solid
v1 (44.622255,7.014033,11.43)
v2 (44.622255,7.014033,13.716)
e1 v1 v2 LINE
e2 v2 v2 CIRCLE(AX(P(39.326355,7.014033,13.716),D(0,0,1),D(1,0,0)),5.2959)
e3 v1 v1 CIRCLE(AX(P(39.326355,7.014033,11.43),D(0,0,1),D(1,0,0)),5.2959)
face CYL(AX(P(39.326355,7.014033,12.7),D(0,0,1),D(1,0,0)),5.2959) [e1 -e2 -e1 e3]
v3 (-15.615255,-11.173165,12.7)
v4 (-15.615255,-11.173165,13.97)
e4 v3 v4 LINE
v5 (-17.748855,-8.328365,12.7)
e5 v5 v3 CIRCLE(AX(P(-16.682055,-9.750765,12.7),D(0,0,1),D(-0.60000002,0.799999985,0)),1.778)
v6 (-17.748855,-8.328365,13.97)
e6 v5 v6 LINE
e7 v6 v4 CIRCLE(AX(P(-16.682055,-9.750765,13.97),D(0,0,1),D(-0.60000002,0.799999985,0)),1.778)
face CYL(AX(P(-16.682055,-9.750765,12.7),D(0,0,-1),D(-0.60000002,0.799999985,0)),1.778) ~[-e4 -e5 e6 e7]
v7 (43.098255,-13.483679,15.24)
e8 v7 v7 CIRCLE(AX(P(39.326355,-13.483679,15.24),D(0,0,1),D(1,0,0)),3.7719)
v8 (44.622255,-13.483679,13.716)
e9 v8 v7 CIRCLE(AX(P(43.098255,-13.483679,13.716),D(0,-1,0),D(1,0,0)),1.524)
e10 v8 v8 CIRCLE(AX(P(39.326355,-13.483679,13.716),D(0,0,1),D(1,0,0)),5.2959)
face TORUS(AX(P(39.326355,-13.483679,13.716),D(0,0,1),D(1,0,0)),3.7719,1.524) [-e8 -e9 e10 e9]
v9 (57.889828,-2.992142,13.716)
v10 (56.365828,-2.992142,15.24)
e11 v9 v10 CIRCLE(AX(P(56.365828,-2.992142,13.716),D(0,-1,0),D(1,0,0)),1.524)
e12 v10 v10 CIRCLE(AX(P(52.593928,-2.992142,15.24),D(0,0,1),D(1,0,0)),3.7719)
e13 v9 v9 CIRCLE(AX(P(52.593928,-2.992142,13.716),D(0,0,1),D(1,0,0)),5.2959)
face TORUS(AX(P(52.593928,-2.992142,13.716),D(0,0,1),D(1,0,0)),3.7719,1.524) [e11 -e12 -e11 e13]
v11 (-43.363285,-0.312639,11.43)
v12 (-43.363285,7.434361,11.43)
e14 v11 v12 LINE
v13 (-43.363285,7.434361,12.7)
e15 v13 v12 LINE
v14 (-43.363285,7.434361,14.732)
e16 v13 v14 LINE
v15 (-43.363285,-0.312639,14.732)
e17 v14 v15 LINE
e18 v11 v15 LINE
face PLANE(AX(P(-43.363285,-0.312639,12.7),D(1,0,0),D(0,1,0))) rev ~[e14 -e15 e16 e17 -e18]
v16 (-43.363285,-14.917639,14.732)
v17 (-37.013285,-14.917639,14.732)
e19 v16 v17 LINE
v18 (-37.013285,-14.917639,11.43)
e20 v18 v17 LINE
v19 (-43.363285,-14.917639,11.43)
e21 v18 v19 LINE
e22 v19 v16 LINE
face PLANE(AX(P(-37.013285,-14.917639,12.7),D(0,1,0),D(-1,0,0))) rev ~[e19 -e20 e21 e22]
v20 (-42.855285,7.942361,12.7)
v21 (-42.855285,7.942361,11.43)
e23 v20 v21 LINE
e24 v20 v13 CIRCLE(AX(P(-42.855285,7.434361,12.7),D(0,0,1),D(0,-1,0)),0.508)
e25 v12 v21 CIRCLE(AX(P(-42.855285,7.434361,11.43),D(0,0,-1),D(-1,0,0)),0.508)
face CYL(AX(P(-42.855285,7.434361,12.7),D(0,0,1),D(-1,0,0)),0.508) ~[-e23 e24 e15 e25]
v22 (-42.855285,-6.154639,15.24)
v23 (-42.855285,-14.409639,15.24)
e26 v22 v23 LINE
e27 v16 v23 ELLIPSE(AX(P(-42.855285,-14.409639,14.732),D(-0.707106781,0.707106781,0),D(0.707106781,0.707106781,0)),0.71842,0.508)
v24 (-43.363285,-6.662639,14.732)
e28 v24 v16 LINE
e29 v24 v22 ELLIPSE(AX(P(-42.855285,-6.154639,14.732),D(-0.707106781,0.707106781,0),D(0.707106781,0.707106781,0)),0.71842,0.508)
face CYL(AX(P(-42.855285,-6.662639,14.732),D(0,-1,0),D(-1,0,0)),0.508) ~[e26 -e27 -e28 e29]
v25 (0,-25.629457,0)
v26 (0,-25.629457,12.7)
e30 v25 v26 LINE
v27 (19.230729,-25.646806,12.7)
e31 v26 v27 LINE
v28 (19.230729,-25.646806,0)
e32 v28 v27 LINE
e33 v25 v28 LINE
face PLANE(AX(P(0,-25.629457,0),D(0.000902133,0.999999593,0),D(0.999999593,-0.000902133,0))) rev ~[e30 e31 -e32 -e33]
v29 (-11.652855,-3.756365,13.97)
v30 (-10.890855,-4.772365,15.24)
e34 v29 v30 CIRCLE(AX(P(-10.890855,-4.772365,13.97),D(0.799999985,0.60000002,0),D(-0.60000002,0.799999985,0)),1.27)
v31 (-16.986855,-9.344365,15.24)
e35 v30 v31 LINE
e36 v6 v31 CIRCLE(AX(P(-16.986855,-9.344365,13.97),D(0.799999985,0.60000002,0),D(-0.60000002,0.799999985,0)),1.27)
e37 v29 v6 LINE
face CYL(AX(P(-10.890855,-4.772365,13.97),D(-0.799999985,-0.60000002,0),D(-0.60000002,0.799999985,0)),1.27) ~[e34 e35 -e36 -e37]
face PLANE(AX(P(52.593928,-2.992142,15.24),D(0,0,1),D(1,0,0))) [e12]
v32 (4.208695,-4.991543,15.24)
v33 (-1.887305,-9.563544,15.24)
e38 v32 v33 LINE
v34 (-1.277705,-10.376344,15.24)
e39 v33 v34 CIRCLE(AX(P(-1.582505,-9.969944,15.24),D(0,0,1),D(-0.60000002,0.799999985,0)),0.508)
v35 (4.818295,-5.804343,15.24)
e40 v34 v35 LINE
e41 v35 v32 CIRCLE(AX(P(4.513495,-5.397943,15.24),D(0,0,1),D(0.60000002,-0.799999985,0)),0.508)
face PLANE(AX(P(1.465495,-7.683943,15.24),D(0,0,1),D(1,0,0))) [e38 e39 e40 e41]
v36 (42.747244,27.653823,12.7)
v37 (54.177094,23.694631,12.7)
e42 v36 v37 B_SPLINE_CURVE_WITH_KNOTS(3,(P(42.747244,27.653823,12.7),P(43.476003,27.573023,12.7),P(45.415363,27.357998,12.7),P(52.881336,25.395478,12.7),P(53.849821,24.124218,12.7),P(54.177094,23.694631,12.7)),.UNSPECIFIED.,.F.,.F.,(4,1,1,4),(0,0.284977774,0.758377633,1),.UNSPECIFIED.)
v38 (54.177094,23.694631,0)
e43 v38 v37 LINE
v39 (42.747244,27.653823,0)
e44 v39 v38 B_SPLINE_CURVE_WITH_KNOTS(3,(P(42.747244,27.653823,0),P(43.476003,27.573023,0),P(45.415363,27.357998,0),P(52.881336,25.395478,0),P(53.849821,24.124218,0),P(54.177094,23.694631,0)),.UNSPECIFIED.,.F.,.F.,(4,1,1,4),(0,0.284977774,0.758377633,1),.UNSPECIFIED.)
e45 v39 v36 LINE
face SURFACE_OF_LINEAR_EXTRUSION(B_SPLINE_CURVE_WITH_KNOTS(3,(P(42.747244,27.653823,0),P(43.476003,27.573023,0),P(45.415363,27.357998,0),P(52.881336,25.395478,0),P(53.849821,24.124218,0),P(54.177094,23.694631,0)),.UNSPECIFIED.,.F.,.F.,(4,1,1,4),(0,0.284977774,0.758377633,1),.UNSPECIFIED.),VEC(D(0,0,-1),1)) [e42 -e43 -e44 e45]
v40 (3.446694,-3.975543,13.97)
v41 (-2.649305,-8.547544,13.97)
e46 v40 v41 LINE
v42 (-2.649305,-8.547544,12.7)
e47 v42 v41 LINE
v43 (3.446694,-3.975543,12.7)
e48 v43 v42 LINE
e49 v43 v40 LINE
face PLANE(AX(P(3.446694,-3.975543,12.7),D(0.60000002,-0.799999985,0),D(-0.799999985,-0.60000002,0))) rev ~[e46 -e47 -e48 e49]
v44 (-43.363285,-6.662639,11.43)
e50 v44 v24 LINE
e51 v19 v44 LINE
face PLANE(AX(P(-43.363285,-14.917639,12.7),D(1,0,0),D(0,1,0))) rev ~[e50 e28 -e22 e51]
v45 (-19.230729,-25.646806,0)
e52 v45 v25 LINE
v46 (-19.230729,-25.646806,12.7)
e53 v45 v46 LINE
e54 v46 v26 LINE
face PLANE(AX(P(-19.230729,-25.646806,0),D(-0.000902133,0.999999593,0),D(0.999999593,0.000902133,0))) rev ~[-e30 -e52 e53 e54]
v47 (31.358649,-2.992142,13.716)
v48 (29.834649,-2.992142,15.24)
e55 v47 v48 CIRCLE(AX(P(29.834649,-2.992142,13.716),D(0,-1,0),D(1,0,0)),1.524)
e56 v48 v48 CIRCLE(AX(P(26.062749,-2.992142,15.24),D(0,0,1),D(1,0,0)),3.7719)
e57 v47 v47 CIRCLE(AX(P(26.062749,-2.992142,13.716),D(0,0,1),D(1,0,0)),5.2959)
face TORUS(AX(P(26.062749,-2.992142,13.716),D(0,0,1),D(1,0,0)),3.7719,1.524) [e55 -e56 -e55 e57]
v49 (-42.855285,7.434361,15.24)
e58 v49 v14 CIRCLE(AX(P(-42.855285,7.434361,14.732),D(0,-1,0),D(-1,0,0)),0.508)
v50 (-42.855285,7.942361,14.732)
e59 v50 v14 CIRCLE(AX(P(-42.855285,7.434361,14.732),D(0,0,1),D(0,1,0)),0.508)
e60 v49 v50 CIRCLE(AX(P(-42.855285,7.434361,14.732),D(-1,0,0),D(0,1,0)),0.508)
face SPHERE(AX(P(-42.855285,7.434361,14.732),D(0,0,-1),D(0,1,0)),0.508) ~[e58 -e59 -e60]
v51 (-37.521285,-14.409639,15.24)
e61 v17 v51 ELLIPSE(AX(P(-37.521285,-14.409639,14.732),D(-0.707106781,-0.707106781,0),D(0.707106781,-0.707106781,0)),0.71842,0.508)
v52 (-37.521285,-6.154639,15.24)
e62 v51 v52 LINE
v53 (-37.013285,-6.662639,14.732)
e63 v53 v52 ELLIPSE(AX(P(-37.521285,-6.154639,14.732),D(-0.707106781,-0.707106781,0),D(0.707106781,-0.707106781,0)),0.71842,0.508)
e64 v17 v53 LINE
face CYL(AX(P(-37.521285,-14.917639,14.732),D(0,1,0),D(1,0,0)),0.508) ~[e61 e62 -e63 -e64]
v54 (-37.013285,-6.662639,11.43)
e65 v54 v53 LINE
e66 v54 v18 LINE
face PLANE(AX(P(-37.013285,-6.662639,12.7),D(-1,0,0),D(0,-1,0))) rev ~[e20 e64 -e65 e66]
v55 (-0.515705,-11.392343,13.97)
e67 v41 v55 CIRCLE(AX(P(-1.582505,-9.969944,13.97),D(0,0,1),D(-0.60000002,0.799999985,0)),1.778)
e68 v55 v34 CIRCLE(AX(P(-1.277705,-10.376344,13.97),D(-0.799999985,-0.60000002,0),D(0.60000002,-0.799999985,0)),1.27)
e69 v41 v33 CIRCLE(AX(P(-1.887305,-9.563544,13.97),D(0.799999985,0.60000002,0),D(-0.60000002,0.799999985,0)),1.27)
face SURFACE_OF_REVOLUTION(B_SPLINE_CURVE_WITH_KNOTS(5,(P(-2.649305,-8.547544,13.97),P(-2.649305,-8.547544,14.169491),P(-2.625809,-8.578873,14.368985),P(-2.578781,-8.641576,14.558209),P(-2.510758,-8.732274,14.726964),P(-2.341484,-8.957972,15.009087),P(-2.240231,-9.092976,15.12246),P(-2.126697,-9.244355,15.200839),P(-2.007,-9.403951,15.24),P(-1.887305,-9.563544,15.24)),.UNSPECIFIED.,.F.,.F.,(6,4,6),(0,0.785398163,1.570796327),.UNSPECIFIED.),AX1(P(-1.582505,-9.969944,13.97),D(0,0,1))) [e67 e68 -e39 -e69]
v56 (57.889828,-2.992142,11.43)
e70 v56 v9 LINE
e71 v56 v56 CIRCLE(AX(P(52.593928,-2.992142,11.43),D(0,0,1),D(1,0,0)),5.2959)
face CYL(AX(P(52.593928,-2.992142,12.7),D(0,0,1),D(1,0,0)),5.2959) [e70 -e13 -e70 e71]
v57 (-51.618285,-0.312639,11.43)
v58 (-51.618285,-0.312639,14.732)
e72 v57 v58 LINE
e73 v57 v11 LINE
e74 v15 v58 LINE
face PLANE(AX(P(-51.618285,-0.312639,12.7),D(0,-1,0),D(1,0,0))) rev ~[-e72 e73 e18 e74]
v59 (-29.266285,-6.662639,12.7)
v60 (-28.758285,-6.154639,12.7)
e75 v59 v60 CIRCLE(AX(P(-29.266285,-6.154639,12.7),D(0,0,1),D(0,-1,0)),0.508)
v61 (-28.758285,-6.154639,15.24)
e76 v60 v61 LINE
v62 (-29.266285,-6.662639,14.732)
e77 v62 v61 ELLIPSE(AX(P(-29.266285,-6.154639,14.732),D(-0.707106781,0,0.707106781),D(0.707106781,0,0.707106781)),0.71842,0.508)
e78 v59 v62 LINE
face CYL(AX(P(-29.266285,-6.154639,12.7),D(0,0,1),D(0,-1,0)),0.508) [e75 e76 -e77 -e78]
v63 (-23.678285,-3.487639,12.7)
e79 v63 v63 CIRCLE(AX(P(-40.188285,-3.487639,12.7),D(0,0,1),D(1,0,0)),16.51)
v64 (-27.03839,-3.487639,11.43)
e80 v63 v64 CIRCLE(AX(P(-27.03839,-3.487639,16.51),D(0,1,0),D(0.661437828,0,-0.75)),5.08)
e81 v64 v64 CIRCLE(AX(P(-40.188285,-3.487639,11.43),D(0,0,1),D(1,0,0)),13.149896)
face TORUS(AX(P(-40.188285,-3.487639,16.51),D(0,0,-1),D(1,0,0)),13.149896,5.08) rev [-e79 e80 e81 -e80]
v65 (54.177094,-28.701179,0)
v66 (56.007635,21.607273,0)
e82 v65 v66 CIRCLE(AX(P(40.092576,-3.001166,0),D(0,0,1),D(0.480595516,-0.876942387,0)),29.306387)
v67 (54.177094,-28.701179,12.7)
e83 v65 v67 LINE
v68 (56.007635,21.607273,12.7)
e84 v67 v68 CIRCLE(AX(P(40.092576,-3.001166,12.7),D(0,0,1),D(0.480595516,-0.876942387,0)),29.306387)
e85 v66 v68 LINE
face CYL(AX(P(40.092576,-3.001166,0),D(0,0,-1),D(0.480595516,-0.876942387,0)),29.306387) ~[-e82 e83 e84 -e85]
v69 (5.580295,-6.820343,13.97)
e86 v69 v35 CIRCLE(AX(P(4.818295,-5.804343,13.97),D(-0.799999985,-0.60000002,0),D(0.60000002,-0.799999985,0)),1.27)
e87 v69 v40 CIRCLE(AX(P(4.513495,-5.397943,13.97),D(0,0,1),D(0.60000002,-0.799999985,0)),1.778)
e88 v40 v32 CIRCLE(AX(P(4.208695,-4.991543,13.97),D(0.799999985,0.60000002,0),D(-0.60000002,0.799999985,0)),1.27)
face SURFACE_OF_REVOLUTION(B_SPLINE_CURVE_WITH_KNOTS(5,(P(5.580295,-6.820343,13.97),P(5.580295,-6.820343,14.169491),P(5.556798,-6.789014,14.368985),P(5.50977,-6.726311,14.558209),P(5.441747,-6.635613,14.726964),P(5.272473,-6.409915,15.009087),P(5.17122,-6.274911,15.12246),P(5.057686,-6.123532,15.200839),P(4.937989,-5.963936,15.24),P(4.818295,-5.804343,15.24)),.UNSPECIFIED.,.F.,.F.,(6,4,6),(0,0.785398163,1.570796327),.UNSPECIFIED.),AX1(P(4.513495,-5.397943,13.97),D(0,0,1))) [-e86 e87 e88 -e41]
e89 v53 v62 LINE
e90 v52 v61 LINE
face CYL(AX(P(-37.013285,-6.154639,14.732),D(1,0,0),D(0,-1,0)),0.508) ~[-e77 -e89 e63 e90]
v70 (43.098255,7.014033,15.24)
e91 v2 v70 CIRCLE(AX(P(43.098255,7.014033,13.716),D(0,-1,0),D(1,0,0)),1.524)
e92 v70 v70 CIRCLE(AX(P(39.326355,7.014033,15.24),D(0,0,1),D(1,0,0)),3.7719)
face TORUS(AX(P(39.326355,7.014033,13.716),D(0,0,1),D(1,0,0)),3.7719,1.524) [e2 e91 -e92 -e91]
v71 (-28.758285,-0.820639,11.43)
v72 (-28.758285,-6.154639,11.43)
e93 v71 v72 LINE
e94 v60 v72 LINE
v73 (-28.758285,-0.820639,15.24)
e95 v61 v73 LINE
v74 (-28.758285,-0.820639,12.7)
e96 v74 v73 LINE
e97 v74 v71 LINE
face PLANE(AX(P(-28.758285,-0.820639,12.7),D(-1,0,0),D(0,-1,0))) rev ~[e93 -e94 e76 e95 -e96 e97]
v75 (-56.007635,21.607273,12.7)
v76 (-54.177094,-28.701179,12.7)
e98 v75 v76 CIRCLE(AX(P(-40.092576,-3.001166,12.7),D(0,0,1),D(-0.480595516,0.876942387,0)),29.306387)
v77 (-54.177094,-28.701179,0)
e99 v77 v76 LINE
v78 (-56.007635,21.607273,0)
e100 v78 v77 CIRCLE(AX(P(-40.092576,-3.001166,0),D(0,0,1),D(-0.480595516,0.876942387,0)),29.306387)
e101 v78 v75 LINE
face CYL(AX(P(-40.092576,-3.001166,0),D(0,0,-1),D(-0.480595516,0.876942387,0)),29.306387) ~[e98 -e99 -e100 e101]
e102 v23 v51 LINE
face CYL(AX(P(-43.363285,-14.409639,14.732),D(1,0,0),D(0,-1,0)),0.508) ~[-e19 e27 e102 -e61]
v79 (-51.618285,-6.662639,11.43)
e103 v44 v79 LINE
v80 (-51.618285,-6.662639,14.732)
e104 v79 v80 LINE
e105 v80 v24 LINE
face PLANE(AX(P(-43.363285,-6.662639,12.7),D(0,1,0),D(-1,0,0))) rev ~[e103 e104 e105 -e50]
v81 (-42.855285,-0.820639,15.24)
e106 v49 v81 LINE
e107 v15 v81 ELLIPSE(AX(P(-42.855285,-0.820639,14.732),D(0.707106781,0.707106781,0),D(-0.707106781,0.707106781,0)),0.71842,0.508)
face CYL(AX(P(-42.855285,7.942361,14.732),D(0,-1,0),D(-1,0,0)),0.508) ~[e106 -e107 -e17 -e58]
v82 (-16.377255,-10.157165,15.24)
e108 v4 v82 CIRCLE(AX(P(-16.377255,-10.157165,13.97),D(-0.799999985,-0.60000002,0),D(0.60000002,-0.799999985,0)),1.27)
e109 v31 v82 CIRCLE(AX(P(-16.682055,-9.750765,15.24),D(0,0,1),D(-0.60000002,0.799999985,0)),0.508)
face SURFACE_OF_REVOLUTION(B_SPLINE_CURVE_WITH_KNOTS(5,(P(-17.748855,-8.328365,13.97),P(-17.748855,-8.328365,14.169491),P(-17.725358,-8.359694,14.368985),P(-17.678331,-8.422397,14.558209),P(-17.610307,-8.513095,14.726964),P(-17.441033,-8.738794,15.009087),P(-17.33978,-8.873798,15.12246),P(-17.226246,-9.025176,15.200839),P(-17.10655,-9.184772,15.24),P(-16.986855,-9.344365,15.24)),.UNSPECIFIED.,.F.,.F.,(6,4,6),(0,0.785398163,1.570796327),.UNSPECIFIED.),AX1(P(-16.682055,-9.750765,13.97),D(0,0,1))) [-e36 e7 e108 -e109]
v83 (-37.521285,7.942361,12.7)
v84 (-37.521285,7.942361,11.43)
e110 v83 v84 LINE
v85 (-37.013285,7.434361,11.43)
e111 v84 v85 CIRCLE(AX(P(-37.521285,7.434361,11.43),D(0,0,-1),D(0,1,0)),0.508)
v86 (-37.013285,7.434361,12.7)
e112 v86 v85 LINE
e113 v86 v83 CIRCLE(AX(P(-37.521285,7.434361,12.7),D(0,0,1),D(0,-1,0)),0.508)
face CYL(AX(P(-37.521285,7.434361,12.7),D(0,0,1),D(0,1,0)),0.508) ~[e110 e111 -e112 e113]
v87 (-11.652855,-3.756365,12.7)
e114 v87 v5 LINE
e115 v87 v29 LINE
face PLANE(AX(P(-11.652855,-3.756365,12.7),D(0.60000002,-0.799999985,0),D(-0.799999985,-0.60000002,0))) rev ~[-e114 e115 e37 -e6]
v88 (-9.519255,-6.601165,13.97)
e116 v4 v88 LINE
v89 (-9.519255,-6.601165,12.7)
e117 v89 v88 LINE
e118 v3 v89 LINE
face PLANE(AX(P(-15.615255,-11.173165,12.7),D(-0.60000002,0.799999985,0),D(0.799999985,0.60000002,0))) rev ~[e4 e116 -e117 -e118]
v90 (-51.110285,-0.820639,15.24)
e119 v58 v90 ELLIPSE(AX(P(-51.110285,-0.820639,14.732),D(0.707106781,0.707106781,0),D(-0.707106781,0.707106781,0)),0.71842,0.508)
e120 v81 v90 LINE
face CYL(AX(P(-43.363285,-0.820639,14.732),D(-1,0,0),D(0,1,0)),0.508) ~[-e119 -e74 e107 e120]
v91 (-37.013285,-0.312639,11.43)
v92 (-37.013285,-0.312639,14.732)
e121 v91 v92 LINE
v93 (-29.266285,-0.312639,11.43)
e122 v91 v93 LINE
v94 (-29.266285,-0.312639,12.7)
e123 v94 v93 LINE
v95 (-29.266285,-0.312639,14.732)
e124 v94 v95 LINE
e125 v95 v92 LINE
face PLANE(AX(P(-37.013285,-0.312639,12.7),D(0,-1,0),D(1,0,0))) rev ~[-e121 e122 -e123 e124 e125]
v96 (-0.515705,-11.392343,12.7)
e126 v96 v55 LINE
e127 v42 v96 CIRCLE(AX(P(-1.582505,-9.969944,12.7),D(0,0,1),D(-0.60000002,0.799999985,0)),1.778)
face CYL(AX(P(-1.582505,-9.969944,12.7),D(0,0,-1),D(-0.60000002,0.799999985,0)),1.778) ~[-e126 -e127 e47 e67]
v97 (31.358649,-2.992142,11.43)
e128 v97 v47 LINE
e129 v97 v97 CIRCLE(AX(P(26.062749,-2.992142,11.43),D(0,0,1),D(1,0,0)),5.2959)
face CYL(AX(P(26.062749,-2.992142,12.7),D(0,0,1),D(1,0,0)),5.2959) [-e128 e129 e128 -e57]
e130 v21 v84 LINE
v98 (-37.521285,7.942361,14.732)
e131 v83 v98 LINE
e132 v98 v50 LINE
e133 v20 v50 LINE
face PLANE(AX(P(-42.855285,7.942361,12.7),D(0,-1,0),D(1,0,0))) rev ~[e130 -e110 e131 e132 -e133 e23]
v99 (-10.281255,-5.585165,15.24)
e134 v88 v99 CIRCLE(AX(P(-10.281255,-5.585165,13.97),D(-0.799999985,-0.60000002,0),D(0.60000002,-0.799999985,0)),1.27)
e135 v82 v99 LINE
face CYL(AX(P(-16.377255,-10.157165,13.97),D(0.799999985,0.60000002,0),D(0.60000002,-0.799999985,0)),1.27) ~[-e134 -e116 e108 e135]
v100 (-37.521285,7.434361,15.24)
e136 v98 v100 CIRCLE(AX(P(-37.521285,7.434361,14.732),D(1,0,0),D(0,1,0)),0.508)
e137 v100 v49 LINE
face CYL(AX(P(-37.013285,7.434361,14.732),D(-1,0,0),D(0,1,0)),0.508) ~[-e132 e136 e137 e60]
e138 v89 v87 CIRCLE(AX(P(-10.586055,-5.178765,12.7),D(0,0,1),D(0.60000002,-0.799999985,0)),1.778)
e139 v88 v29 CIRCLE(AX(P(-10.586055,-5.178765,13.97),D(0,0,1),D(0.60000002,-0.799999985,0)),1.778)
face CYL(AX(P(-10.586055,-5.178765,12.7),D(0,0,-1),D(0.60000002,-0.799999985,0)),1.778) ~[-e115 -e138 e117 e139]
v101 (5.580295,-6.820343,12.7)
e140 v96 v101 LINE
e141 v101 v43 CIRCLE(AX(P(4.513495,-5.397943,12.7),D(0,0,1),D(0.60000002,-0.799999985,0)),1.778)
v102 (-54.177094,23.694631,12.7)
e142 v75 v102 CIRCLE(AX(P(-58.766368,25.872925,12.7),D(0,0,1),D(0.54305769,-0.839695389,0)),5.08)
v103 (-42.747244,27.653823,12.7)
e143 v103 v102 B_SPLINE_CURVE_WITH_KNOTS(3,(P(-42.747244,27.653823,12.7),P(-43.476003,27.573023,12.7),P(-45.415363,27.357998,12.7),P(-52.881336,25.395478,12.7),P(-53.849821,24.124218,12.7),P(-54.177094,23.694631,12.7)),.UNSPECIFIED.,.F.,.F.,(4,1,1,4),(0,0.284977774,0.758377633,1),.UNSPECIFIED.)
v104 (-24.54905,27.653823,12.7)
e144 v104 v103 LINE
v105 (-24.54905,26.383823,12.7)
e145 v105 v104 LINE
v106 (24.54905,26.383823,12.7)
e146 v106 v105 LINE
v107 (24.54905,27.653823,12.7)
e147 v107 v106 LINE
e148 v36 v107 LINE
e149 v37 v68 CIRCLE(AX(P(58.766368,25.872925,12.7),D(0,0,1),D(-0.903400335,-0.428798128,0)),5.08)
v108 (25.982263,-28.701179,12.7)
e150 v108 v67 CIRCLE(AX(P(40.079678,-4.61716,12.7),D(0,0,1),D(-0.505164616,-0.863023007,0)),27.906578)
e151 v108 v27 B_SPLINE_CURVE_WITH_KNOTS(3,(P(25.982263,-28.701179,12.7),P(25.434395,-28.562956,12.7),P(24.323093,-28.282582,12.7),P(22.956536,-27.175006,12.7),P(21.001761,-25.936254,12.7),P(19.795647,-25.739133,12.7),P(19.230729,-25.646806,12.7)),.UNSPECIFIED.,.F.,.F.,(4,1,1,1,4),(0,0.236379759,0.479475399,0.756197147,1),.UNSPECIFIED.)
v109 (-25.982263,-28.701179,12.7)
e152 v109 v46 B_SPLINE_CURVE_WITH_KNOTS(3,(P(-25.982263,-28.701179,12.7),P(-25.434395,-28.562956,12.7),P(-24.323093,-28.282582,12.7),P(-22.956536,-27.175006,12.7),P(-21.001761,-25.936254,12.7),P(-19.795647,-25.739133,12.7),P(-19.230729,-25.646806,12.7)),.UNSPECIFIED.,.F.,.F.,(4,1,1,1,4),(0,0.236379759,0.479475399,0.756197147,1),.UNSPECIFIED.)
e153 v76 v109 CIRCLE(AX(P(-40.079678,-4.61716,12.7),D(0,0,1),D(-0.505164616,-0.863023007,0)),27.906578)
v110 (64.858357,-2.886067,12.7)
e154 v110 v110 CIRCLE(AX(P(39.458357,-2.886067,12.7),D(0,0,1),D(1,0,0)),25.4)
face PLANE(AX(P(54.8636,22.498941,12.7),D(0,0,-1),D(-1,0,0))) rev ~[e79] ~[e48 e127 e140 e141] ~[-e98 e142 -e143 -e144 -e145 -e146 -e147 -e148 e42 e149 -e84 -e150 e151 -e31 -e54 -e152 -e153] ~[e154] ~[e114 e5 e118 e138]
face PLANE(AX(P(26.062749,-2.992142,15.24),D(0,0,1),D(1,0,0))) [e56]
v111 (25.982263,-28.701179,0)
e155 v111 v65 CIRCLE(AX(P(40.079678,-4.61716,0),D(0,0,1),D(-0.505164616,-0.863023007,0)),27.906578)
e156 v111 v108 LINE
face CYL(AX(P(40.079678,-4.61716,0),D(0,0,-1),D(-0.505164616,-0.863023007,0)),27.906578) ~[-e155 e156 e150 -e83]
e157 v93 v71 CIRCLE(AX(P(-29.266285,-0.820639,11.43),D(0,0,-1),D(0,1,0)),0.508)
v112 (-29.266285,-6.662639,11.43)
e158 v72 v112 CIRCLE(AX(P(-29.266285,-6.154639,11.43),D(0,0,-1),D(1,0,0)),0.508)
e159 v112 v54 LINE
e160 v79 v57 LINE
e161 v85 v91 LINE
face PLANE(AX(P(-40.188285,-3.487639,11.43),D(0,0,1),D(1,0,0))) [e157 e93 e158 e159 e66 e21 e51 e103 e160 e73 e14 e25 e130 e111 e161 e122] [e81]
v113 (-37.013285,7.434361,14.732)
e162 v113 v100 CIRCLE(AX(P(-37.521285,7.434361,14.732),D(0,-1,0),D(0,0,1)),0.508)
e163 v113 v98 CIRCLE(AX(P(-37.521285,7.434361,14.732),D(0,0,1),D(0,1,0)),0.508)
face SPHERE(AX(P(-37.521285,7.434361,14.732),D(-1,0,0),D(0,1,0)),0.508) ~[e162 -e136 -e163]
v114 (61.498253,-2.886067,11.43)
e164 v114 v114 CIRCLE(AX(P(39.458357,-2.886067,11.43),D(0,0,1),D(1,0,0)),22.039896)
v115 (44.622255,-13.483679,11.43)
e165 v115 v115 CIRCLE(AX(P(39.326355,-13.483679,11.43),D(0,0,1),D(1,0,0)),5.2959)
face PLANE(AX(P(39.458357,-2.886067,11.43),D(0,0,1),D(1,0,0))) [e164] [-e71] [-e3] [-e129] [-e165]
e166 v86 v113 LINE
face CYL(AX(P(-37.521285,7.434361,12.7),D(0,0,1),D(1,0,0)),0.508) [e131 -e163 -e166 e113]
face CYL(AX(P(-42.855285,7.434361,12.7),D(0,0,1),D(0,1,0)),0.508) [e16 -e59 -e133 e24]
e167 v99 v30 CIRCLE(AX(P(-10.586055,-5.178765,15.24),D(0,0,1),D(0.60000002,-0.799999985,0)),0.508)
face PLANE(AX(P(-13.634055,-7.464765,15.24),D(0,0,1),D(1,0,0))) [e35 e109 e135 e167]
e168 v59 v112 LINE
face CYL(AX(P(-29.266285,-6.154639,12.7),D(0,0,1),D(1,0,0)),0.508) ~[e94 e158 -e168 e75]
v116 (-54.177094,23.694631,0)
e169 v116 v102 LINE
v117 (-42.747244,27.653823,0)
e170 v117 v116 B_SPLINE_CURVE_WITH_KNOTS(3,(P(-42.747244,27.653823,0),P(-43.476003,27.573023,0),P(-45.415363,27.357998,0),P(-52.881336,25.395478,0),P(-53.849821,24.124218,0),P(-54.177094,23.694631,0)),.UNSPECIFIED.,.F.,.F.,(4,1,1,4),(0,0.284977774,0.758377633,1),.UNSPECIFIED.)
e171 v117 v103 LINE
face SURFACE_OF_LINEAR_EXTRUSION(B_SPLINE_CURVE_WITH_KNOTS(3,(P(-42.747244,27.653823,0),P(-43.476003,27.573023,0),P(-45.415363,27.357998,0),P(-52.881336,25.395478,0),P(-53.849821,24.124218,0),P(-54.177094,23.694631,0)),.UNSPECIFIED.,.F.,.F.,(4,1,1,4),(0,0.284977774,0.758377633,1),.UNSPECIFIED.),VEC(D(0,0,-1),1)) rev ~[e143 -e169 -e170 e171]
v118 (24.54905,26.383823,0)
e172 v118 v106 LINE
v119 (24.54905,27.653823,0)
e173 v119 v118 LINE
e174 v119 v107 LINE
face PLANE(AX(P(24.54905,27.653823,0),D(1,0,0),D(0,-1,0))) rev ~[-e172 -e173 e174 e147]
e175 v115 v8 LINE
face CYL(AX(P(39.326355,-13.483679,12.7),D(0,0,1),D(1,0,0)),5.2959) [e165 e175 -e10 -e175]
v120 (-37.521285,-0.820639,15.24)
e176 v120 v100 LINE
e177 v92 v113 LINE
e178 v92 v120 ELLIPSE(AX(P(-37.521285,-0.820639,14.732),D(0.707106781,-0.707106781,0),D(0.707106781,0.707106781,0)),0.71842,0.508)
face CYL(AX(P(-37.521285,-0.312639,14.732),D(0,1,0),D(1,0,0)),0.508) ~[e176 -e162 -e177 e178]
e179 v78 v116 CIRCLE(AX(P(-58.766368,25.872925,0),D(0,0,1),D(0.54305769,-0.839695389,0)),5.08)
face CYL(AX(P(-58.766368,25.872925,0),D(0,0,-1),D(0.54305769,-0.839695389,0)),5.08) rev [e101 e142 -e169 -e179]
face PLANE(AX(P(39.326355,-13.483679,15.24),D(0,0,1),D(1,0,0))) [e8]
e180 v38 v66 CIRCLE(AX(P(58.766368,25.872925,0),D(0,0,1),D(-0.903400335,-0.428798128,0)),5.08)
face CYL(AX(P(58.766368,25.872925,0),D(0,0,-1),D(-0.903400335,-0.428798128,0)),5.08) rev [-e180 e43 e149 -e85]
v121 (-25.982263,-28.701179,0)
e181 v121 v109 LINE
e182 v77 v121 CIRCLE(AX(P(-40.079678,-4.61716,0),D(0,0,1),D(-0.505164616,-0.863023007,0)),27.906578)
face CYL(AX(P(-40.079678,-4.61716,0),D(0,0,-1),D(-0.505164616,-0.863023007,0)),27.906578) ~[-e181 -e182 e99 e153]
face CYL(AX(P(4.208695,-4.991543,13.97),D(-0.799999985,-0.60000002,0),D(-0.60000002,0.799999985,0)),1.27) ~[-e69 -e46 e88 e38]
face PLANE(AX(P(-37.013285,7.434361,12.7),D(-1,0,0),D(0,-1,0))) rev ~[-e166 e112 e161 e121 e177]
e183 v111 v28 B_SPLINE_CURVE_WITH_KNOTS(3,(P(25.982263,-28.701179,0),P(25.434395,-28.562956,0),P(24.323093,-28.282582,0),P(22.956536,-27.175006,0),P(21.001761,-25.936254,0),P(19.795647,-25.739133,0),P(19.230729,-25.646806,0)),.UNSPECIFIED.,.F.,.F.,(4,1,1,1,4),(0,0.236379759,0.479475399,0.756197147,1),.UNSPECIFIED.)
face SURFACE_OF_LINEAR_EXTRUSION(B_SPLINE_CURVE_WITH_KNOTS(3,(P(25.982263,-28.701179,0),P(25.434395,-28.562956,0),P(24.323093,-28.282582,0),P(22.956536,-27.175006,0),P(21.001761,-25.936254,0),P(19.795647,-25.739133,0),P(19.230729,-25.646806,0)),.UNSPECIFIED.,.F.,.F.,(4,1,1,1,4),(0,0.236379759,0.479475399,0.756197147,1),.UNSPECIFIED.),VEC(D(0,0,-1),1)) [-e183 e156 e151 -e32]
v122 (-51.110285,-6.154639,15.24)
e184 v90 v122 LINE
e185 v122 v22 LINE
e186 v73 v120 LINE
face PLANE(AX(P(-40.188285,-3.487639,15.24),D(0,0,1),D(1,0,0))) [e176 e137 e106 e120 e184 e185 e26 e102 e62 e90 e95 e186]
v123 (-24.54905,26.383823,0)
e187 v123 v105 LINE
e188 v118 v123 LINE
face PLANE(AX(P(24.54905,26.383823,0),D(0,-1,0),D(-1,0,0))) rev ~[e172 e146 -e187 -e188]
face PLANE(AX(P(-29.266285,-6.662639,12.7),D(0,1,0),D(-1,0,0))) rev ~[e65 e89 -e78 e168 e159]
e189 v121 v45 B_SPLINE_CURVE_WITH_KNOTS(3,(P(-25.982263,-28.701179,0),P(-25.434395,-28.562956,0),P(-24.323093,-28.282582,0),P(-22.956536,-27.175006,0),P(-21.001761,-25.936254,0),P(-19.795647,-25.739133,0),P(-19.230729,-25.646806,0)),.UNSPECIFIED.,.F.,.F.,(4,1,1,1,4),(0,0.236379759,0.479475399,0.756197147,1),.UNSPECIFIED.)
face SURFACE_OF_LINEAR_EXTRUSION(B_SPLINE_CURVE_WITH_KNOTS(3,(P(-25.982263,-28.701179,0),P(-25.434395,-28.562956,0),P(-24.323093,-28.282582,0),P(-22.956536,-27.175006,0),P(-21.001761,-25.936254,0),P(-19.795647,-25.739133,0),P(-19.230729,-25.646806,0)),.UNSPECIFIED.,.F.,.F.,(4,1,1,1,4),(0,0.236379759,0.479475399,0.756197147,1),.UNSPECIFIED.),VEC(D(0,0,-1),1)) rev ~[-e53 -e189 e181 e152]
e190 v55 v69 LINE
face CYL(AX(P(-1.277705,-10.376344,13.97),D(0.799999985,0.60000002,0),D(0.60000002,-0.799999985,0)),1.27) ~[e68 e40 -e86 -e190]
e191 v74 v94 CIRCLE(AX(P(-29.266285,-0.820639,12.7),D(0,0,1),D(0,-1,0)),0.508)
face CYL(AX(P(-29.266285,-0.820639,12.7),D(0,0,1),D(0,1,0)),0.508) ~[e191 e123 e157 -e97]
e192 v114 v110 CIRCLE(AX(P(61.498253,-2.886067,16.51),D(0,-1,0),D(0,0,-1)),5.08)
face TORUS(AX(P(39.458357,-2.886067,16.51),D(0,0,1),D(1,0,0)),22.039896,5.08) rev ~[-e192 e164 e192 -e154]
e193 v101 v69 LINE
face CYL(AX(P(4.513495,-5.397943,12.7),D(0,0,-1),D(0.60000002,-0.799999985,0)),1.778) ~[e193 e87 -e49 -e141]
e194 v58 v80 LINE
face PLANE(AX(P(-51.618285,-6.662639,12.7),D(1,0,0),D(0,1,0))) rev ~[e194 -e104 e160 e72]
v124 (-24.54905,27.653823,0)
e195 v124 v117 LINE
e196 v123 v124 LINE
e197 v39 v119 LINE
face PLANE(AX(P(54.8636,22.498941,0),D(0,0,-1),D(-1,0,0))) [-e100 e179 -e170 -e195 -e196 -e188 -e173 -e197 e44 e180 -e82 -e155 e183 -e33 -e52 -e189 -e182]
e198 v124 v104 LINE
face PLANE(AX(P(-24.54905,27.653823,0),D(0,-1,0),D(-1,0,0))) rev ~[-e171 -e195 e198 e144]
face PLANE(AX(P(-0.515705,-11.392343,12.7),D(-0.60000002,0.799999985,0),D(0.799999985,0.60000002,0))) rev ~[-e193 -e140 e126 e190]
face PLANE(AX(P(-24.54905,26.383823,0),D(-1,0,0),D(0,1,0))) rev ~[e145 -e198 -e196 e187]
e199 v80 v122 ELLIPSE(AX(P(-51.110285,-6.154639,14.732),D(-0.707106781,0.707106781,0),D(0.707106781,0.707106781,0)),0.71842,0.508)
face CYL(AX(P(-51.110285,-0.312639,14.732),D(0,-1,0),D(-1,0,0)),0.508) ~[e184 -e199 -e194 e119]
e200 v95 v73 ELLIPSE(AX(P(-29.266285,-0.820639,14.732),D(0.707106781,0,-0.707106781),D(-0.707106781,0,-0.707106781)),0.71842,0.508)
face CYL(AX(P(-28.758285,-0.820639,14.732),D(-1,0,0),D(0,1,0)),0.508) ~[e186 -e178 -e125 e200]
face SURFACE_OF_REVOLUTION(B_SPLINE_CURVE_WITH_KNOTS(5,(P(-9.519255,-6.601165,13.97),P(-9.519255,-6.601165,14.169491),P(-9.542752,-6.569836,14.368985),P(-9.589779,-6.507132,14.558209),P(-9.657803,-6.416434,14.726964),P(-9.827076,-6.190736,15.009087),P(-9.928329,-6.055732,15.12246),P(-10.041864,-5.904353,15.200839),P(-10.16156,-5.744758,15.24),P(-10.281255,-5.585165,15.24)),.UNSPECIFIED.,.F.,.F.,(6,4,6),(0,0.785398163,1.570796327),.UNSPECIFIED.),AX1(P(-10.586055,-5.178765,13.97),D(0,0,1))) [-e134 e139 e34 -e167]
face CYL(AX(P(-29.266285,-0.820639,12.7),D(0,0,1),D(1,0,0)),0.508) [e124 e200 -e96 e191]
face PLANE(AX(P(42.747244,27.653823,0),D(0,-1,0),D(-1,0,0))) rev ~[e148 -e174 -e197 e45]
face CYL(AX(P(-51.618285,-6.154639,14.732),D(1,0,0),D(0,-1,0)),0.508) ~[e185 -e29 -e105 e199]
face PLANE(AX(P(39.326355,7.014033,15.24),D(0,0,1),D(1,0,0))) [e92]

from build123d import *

# Parameters (mm, degrees)
F1_DEPTH     = 12.7
F2_R         = 5.2959
F3_DEPTH     = 2.54
F4_R         = 0.508
F5_R         = 1.27
F6_R         = 1.524
F7_R         = 16.51
F7_R_2       = 25.4
F7_R_3       = 5.2959
F8_DEPTH     = 1.27
F9_T1_DEPTH  = 12.7
F10_T1_DEPTH = 12.7


# Not quite as in the source:
# - a fillet or chamfer that OpenCascade refuses, or shapes differently, is made with other operations: its cross-section is extruded or revolved along the edge and cut away or added


with BuildPart() as f1:
    # F0 (on Top) → F1 (new body)
    with BuildSketch(Plane.XY):
        with BuildLine():
            Line((0, -25.6294570863), (0, 0))
            Line((0, 0), (0, 26.3838227838))
            Line((0, 26.3838227838), (-24.5490502566, 26.3838227838))
            Line((-24.5490502566, 26.3838227838), (-24.5490502566, 27.6538227838))
            Line((-24.5490502566, 27.6538227838), (-42.7472442389, 27.6538227838))
            add(Edge.make_bspline(
                [(-42.7472442389, 27.6538227838), (-43.4760030996, 27.5730225568), (-45.4153628334, 27.3579984724), (-52.8813355612, 25.3954780063), (-53.8498209002, 24.1242184105), (-54.1770942509, 23.6946307123)],
                knots=[0, 0, 0, 0, 0.2849777741, 0.7583776333, 1, 1, 1, 1], degree=3))
            Line((-54.1770942509, 23.6946307123), (-54.1770942509, 22.698847577))
            ThreePointArc((-54.1770942509, 22.698847577), (-69.3989631751, -3.0011655763), (-54.1770942509, -28.7011787295))
            ThreePointArc((-54.1770942509, -28.7011787295), (-40.0796784088, -32.5237378873), (-25.9822625667, -28.7011787295))
            add(Edge.make_bspline(
                [(-25.9822625667, -28.7011787295), (-25.4343945091, -28.56295557), (-24.3230926927, -28.2825821367), (-22.9565361011, -27.1750055362), (-21.0017610227, -25.9362543342), (-19.795647402, -25.7391331905), (-19.230728969, -25.6468057632)],
                knots=[0, 0, 0, 0, 0.2363797592, 0.4794753994, 0.7561971471, 1, 1, 1, 1], degree=3))
            Line((-19.230728969, -25.6468057632), (0, -25.6294570863))
        make_face()
        with BuildLine():
            Line((0, 26.3838227838), (0, 0))
            Line((0, 0), (0, -25.6294570863))
            Line((0, -25.6294570863), (19.230728969, -25.6468057632))
            add(Edge.make_bspline(
                [(25.9822625667, -28.7011787295), (25.4343945091, -28.56295557), (24.3230926927, -28.2825821367), (22.9565361011, -27.1750055362), (21.0017610227, -25.9362543342), (19.795647402, -25.7391331905), (19.230728969, -25.6468057632)],
                knots=[0, 0, 0, 0, 0.2363797592, 0.4794753994, 0.7561971471, 1, 1, 1, 1], degree=3))
            ThreePointArc((25.9822625667, -28.7011787295), (40.0796784088, -32.5237378873), (54.1770942509, -28.7011787295))
            ThreePointArc((54.1770942509, -28.7011787295), (69.3989631751, -3.0011655763), (54.1770942509, 22.698847577))
            Line((54.1770942509, 22.698847577), (54.1770942509, 23.6946307123))
            add(Edge.make_bspline(
                [(42.7472442389, 27.6538227838), (43.4760030996, 27.5730225568), (45.4153628334, 27.3579984724), (52.8813355612, 25.3954780063), (53.8498209002, 24.1242184105), (54.1770942509, 23.6946307123)],
                knots=[0, 0, 0, 0, 0.2849777741, 0.7583776333, 1, 1, 1, 1], degree=3))
            Line((42.7472442389, 27.6538227838), (24.5490502566, 27.6538227838))
            Line((24.5490502566, 27.6538227838), (24.5490502566, 26.3838227838))
            Line((24.5490502566, 26.3838227838), (0, 26.3838227838))
        make_face()
    extrude(amount=F1_DEPTH)

    # F2 (on face) → F3 (join)
    with BuildSketch(Plane.XY.offset(12.7)):
        Polygon((-51.6182854772, -0.3126390842), (-51.6182854772, -3.4876390842), (-51.6182854772, -6.6626390842), (-43.3632854772, -6.6626390842), (-43.3632854772, -14.9176390842), (-40.1882854772, -14.9176390842), (-37.0132854772, -14.9176390842), (-37.0132854772, -6.6626390842), (-28.7582854772, -6.6626390842), (-28.7582854772, -3.4876390842), (-28.7582854772, -0.3126390842), (-37.0132854772, -0.3126390842), (-37.0132854772, 7.9423609158), (-40.1882854772, 7.9423609158), (-43.3632854772, 7.9423609158), (-43.3632854772, -0.3126390842), align=None)
        with BuildLine():
            Line((-11.6528549959, -3.7563646925), (-17.7488548827, -8.3283648434))
            ThreePointArc((-17.7488548827, -8.3283648434), (-18.1044548211, -10.8175648522), (-15.6152548123, -11.1731647906))
            Line((-15.6152548123, -11.1731647906), (-9.5192549254, -6.6011646397))
            ThreePointArc((-9.5192549254, -6.6011646397), (-9.1636549871, -4.1119646309), (-11.6528549959, -3.7563646925))
        make_face()
        with BuildLine():
            Line((3.4466944985, -3.9755433972), (-2.6493053883, -8.547543548))
            ThreePointArc((-2.6493053883, -8.547543548), (-3.0049053267, -11.0367435568), (-0.5157053179, -11.3923434952))
            Line((-0.5157053179, -11.3923434952), (5.5802945689, -6.8203433443))
            ThreePointArc((5.5802945689, -6.8203433443), (5.9358945073, -4.3311433355), (3.4466944985, -3.9755433972))
        make_face()
        with Locations((26.0627494857, -2.9921420355)):
            Circle(F2_R)
        with Locations((39.3263548613, 7.014032919)):
            Circle(F2_R)
        with Locations((52.5939278305, -2.9921420355)):
            Circle(F2_R)
        with Locations((39.3263548613, -13.4836789221)):
            Circle(F2_R)
    extrude(amount=F3_DEPTH)

    # F4
    f4_edges = [f1.edges().sort_by_distance(p)[0] for p in [
        (-43.363285, 7.942361, 13.97),
        (-40.188285, 7.942361, 15.24),
        (-37.013285, 7.942361, 13.97),
        (-37.013285, 3.814861, 15.24),
        (-32.885785, -0.312639, 15.24),
        (-28.758285, -0.312639, 13.97),
        (-28.758285, -6.662639, 13.97),
        (-32.885785, -6.662639, 15.24),
        (-47.490785, -6.662639, 15.24),
        (-47.490785, -0.312639, 15.24),
        (-43.363285, 3.814861, 15.24),
        (-51.618285, -3.487639, 15.24),
        (-40.188285, -14.917639, 15.24),
        (-43.363285, -10.790139, 15.24),
        (-37.013285, -10.790139, 15.24),
    ]]
    fillet(f4_edges, radius=F4_R)

    # F5
    f5_edges = [f1.edges().sort_by_distance(p)[0] for p in [
        (-14.700855, -6.042365, 15.24),
        (0.398695, -6.261543, 15.24),
        (-18.104455, -10.817565, 15.24),
        (-12.567255, -8.887165, 15.24),
        (-9.163655, -4.111965, 15.24),
        (5.935895, -4.331143, 15.24),
        (-3.004905, -11.036744, 15.24),
        (2.532295, -9.106343, 15.24),
    ]]
    fillet(f5_edges, radius=F5_R)

    # F6
    f6_edges = [f1.edges().sort_by_distance(p)[0] for p in [
        (20.766849, -2.992142, 15.24),
        (47.298028, -2.992142, 15.24),
        (34.030455, 7.014033, 15.24),
        (34.030455, -13.483679, 15.24),
    ]]
    fillet(f6_edges, radius=F6_R)

    # F7 (on face) → F8 (cut)
    with BuildSketch(Plane.XY.offset(12.7)):
        with Locations((-40.1882854772, -3.4876391292)):
            Circle(F7_R)
        with BuildLine():
            ThreePointArc((-28.7582854772, -6.1546390842), (-28.9070752323, -6.513849329), (-29.2662854772, -6.6626390842))
            Line((-29.2662854772, -6.6626390842), (-37.0132854772, -6.6626390842))
            Line((-37.0132854772, -6.6626390842), (-37.0132854772, -14.9176390842))
            Line((-37.0132854772, -14.9176390842), (-43.3632854772, -14.9176390842))
            Line((-43.3632854772, -14.9176390842), (-43.3632854772, -6.6626390842))
            Line((-43.3632854772, -6.6626390842), (-51.6182854772, -6.6626390842))
            Line((-51.6182854772, -6.6626390842), (-51.6182854772, -0.3126390842))
            Line((-51.6182854772, -0.3126390842), (-43.3632854772, -0.3126390842))
            Line((-43.3632854772, -0.3126390842), (-43.3632854772, 7.4343609158))
            ThreePointArc((-43.3632854772, 7.4343609158), (-43.214495722, 7.7935711607), (-42.8552854772, 7.9423609158))
            Line((-42.8552854772, 7.9423609158), (-37.5212854772, 7.9423609158))
            ThreePointArc((-37.5212854772, 7.9423609158), (-37.1620752323, 7.7935711607), (-37.0132854772, 7.4343609158))
            Line((-37.0132854772, 7.4343609158), (-37.0132854772, -0.3126390842))
            Line((-37.0132854772, -0.3126390842), (-29.2662854772, -0.3126390842))
            ThreePointArc((-29.2662854772, -0.3126390842), (-28.9070752323, -0.4614288393), (-28.7582854772, -0.8206390842))
            Line((-28.7582854772, -0.8206390842), (-28.7582854772, -6.1546390842))
        make_face(mode=Mode.SUBTRACT)
        with Locations((39.4583567977, -2.8860671446)):
            Circle(F7_R_2)
        with Locations((26.0627494857, -2.9921420355)):
            Circle(F7_R_3, mode=Mode.SUBTRACT)
        with Locations((39.3263548613, -13.4836789221)):
            Circle(F7_R_3, mode=Mode.SUBTRACT)
        with Locations((52.5939278305, -2.9921420355)):
            Circle(F7_R_3, mode=Mode.SUBTRACT)
        with Locations((39.3263548613, 7.014032919)):
            Circle(F7_R_3, mode=Mode.SUBTRACT)
    extrude(amount=-F8_DEPTH, mode=Mode.SUBTRACT)

    # F9: fillet of radius 5.08 on 1 edges, made by hand

    # F9_s2 → F9_t1 (join)
    with BuildSketch(Plane.XY):
        with BuildLine():
            ThreePointArc((-56.0076348906, 21.607272627), (-54.9470006237, 22.52347253), (-54.1770942509, 23.6946307123))
            Line((-54.1770942509, 23.6946307123), (-54.0853087769, 23.6510648225))
            ThreePointArc((-54.0853087769, 23.6510648225), (-54.0754942509, 23.1967391446), (-54.0754942509, 22.698847577))
            Line((-54.0754942509, 22.698847577), (-54.1282657465, 22.6097502305))
            ThreePointArc((-54.1282657465, 22.6097502305), (-55.0502548962, 22.0824433564), (-55.9524602294, 21.5219595755))
            Line((-55.9524602294, 21.5219595755), (-56.0076348906, 21.607272627))
        make_face()
    extrude(amount=F9_T1_DEPTH)

    # F10: fillet of radius 5.08 on 1 edges, made by hand

    # F10_s2 → F10_t1 (join)
    with BuildSketch(Plane.XY):
        with BuildLine():
            ThreePointArc((54.1770942509, 23.6946307123), (54.9470006237, 22.52347253), (56.0076348906, 21.607272627))
            Line((56.0076348906, 21.607272627), (55.9524602294, 21.5219595755))
            ThreePointArc((55.9524602294, 21.5219595755), (55.0502548962, 22.0824433564), (54.1282657465, 22.6097502305))
            Line((54.1282657465, 22.6097502305), (54.0754942509, 22.698847577))
            ThreePointArc((54.0754942509, 22.698847577), (54.0754942509, 23.1967391446), (54.0853087769, 23.6510648225))
            Line((54.0853087769, 23.6510648225), (54.1770942509, 23.6946307123))
        make_face()
    extrude(amount=F10_T1_DEPTH)

    # F11: fillet of radius 5.08 on 2 edges, made by hand

    # F11_s1 → F11_t2 (revolve)
    with BuildSketch(Plane.XZ.offset(2.8860671446)):
        with BuildLine():
            ThreePointArc((61.4982526326, 11.43), (63.2943038569, 11.7580951188), (64.8583567977, 12.7))
            Line((64.8583567977, 12.7), (64.8583567977, 11.43))
            Line((64.8583567977, 11.43), (61.4982526326, 11.43))
        make_face()
    revolve(axis=Axis((39.4583567977, -2.8860671446, 11.43), (0, 0, 1)))

    # F11_s3 → F11_t4 (revolve)
    with BuildSketch(Plane.XZ.offset(3.4876391292)):
        with BuildLine():
            ThreePointArc((-23.6782854772, 12.7), (-25.242338418, 11.7580951188), (-27.0383896422, 11.43))
            Line((-27.0383896422, 11.43), (-23.6782854772, 11.43))
            Line((-23.6782854772, 11.43), (-23.6782854772, 12.7))
        make_face()
    revolve(axis=Axis((-40.1882854772, -3.4876391292, 11.43), (0, 0, 1)))


solid = f1.part
